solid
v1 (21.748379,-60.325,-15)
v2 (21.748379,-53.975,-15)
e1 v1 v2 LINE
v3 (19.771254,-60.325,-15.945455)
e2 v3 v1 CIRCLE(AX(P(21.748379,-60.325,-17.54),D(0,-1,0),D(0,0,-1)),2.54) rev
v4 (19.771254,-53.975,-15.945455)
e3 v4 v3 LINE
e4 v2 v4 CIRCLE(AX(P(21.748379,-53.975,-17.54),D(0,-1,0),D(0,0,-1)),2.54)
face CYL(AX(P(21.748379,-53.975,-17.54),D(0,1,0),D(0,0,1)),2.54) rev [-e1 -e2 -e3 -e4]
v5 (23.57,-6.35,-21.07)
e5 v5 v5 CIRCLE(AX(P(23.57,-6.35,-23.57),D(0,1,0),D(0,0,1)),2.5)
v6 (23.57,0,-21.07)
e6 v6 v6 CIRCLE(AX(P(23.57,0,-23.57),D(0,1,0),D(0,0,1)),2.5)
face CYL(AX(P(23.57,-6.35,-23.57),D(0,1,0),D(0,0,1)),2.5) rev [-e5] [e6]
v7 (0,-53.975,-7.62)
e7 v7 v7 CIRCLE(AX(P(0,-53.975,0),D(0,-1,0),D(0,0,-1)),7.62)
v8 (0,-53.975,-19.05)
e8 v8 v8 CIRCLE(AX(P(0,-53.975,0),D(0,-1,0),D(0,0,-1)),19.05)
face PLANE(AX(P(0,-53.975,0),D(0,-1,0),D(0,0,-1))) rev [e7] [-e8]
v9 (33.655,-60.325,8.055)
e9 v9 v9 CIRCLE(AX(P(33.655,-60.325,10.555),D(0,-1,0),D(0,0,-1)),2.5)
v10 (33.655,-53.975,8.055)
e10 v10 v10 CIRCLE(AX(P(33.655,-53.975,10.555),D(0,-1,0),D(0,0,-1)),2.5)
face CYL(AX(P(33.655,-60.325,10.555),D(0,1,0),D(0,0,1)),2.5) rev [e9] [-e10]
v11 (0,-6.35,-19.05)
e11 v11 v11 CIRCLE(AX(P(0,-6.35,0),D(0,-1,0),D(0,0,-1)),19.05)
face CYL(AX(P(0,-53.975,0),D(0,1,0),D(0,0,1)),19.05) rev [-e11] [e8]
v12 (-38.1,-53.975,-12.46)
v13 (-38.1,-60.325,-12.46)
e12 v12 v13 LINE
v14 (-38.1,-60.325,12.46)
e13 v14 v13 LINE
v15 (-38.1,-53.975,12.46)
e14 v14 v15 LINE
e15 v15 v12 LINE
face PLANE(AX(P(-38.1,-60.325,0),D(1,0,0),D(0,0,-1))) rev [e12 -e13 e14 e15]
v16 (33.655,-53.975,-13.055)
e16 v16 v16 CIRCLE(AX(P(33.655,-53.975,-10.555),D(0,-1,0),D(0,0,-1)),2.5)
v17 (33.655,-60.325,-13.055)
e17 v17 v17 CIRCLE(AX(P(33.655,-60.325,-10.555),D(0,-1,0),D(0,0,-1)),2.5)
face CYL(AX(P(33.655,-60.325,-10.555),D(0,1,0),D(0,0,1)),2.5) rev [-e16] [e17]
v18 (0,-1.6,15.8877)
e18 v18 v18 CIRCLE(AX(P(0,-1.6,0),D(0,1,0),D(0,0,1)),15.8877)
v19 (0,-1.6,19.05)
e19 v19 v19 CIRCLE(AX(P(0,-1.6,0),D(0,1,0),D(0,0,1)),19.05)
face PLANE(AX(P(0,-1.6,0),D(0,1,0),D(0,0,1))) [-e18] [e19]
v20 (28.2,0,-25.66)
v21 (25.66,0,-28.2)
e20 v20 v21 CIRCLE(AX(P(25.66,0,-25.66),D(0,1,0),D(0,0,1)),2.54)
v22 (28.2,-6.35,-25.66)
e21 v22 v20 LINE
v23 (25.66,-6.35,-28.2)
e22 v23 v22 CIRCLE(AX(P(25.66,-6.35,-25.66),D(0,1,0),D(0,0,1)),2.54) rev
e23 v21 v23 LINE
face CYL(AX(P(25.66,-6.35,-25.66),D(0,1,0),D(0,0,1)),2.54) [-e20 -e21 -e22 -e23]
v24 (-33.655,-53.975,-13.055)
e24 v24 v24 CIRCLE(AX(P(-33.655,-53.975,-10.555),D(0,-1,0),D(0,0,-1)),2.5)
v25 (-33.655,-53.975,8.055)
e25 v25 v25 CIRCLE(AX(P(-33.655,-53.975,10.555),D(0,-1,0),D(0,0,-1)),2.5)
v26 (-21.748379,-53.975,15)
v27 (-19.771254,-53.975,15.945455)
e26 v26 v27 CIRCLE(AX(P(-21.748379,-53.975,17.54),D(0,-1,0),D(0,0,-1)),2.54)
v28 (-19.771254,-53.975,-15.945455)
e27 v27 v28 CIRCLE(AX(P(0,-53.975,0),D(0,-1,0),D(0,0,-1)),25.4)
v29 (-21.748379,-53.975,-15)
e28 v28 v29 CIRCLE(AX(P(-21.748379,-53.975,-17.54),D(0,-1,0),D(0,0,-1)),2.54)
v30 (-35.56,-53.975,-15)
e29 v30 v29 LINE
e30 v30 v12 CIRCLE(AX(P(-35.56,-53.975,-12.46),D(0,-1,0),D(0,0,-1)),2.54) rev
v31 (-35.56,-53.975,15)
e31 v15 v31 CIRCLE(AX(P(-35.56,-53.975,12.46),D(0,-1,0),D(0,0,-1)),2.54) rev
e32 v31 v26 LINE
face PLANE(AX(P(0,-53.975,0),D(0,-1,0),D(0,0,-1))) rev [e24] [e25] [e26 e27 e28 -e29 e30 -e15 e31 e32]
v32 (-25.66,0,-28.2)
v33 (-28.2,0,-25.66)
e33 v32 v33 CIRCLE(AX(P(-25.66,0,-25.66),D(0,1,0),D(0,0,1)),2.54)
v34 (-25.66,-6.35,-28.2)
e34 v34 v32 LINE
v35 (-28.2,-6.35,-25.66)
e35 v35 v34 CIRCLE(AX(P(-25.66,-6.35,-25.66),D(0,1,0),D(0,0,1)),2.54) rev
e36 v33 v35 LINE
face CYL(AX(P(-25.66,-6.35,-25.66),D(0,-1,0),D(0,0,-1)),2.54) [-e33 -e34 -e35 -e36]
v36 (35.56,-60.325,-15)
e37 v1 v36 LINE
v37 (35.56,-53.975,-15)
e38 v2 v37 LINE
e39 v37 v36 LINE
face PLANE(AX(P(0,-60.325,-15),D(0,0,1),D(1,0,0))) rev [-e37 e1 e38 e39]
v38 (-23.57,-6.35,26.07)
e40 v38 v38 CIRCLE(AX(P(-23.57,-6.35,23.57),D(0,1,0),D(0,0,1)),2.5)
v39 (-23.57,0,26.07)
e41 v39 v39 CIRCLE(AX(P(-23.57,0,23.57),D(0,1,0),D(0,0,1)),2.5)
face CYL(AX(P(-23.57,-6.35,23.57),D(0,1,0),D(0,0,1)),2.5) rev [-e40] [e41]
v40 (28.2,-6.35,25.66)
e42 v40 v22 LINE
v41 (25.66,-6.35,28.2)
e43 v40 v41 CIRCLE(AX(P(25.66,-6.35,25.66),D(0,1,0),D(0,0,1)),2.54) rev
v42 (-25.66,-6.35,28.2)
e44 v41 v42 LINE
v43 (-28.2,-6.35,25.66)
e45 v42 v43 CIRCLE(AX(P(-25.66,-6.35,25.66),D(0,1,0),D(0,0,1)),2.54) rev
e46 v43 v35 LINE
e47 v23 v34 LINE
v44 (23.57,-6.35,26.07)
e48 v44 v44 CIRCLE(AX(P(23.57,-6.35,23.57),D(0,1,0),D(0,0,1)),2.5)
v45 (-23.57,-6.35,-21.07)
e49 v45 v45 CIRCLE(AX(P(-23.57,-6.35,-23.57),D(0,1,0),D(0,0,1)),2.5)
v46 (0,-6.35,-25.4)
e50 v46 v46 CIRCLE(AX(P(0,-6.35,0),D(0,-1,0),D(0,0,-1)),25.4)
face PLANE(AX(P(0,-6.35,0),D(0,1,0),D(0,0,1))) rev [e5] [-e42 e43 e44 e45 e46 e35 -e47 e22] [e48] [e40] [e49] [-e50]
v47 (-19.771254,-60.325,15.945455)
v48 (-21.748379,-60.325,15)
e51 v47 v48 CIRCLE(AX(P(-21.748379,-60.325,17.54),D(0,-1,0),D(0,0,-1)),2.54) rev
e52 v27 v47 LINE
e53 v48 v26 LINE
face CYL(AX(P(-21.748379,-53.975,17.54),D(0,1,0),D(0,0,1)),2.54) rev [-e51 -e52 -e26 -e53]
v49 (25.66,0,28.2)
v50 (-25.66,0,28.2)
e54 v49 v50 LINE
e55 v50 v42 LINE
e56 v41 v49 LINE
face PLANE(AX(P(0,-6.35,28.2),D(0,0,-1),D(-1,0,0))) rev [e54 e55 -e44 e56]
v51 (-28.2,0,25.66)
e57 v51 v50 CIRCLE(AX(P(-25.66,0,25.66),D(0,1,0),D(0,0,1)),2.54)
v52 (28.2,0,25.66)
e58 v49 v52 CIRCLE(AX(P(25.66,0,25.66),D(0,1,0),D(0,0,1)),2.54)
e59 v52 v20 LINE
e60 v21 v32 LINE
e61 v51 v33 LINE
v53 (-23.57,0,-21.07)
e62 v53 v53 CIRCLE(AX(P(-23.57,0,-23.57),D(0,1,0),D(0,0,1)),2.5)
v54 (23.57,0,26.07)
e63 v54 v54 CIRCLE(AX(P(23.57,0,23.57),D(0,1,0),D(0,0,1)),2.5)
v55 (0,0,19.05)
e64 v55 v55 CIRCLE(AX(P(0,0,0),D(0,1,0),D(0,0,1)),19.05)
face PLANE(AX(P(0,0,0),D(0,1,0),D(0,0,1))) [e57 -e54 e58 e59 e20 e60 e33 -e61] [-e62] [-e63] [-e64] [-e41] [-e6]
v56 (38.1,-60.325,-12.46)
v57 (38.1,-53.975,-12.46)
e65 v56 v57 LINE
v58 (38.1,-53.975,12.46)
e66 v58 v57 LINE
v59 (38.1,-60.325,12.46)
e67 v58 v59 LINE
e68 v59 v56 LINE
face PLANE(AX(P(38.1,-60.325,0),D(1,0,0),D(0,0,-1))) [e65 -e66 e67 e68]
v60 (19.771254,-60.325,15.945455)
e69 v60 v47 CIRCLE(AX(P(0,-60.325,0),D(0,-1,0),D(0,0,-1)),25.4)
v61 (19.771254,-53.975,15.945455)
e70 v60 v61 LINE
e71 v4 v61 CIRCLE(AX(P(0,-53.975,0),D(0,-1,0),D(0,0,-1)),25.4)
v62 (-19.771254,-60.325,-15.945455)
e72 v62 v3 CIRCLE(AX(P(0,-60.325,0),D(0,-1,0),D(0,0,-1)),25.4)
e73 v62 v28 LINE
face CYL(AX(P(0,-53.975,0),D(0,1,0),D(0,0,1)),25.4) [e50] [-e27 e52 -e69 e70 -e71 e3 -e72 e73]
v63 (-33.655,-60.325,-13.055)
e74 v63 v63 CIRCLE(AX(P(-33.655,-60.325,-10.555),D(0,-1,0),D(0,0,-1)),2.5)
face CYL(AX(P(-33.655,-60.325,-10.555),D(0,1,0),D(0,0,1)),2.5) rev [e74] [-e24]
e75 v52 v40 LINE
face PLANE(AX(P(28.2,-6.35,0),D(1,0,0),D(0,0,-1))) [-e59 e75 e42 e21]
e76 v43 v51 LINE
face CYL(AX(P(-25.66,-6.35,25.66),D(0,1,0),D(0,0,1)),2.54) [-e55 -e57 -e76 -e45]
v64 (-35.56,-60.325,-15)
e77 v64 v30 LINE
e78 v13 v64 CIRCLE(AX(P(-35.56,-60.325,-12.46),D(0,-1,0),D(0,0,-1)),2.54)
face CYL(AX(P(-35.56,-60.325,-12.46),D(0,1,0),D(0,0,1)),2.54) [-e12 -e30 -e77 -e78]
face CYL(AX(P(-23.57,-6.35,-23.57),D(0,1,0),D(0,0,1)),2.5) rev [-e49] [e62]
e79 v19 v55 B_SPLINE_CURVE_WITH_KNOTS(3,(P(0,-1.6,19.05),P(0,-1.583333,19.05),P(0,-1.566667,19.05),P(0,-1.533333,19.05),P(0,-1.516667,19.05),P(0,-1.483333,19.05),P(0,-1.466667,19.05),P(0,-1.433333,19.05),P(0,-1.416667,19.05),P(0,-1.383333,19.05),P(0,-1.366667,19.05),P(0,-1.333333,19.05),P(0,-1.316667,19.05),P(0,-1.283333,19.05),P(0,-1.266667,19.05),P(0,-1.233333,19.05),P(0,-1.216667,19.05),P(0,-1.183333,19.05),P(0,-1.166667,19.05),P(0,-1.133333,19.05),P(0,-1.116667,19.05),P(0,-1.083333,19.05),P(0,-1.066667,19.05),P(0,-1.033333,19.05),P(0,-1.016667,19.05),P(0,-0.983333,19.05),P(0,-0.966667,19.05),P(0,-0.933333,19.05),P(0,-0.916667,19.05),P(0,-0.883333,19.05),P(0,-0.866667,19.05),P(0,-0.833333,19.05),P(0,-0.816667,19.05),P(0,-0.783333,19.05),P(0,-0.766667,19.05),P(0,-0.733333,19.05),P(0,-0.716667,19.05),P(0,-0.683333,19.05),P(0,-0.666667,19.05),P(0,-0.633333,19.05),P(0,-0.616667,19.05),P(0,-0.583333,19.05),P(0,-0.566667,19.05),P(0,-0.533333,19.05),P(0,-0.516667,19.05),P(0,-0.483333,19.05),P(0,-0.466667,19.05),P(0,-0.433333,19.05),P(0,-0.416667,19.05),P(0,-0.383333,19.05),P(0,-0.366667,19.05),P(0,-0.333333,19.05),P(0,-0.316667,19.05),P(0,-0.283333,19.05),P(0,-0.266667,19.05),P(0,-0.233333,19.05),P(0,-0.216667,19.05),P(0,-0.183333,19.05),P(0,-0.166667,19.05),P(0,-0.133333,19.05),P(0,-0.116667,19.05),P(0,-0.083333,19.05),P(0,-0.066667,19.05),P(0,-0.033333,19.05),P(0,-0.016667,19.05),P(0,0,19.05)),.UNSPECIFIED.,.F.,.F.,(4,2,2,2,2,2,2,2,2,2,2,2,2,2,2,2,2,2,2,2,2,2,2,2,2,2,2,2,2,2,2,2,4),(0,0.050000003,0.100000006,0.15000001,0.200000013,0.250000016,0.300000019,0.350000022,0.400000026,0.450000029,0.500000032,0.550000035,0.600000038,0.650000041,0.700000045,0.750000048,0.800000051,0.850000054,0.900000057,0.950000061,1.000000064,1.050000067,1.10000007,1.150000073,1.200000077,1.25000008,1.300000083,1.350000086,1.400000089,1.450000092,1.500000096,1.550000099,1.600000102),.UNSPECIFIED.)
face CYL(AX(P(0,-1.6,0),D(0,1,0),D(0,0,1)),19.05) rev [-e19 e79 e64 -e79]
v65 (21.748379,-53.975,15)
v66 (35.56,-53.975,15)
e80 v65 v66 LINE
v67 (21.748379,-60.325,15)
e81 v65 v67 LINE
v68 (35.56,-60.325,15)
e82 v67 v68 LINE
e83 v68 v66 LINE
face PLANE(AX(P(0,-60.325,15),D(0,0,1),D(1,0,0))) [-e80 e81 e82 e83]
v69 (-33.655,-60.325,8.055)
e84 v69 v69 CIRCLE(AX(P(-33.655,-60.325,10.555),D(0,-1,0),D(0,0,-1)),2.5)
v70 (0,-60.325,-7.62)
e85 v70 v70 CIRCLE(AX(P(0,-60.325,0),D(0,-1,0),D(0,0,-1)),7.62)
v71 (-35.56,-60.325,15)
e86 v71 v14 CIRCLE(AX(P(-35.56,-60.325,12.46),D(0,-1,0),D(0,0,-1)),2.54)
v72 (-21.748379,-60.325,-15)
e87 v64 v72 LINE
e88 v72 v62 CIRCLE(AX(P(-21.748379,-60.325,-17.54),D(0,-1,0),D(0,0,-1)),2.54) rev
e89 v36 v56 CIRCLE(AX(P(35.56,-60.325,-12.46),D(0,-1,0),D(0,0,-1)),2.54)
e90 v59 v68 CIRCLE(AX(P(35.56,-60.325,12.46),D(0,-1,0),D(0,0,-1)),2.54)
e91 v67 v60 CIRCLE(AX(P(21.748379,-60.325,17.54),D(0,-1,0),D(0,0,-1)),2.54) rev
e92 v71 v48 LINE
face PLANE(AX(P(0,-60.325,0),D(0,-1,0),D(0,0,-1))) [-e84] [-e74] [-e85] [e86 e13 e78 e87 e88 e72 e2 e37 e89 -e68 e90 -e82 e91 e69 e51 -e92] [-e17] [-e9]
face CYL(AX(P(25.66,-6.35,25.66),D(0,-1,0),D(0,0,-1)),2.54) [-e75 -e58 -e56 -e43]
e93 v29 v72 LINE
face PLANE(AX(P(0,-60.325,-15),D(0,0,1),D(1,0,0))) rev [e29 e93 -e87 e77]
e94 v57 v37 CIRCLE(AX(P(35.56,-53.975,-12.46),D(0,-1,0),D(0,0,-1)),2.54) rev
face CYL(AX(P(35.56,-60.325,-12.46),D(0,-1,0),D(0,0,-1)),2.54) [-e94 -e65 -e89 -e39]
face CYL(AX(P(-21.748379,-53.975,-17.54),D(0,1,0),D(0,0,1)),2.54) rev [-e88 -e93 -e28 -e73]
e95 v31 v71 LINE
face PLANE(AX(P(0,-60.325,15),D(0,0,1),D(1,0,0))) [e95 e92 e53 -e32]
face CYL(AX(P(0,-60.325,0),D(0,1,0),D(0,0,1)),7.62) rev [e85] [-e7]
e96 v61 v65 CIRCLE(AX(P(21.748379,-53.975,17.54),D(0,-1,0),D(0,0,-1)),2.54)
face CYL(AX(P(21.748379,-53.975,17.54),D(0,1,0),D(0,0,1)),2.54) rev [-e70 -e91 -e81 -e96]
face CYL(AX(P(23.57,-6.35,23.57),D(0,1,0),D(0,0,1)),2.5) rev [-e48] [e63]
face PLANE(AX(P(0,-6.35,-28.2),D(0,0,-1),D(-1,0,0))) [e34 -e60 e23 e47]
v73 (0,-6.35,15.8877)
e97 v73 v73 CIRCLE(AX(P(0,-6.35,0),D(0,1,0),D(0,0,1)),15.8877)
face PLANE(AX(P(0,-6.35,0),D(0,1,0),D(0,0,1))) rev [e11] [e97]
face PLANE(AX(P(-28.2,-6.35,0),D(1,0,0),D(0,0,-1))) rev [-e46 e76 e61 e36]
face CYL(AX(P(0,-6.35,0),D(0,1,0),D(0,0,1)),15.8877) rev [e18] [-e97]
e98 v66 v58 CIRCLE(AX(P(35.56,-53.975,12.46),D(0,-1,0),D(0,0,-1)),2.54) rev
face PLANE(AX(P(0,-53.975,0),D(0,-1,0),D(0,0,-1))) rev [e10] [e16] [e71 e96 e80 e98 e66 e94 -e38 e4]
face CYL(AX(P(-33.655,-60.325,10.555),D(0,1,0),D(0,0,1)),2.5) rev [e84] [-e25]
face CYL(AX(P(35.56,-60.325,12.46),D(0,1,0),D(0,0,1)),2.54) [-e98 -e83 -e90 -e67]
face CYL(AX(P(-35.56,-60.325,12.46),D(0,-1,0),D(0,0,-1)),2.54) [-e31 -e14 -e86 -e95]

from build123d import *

# Parameters (mm, degrees)
SKETCH2_W           = 56.399999976
SKETCH2_H           = 56.399999976
SKETCH2_R           = 15.8877
SKETCH2_R_2         = 2.499999953
BOSS_EXTRUDE1_DEPTH = 6.35
SKETCH2_4_R         = 19.05
SKETCH2_4_R_2       = 15.8877
CUT_EXTRUDE2_DEPTH  = 1.600000102
SKETCH3_R           = 25.4
SKETCH3_R_2         = 19.05
BOSS_EXTRUDE2_DEPTH = 47.625
SKETCH4_R           = 2.5
SKETCH4_R_2         = 7.62
BOSS_EXTRUDE3_DEPTH = 6.35
FILLET1_R           = 2.54


with BuildPart() as part:
    # Sketch2 → Boss-Extrude1 (new body)
    with BuildSketch(Plane(origin=(0, 0, 0), x_dir=(1, 0, 0), z_dir=(0, 1, 0))):
        Rectangle(SKETCH2_W, SKETCH2_H)
        with Locations(Location((0, 0, 0), (0, 0, 270))):
            Circle(SKETCH2_R, mode=Mode.SUBTRACT)
        with Locations(Location((23.569999977, 23.569999977, 0), (0, 0, 270))):
            Circle(SKETCH2_R_2, mode=Mode.SUBTRACT)
        with Locations(Location((23.569999977, -23.569999977, 0), (0, 0, 270))):
            Circle(SKETCH2_R_2, mode=Mode.SUBTRACT)
        with Locations(Location((-23.569999977, -23.569999977, 0), (0, 0, 270))):
            Circle(SKETCH2_R_2, mode=Mode.SUBTRACT)
        with Locations(Location((-23.569999977, 23.569999977, 0), (0, 0, 270))):
            Circle(SKETCH2_R_2, mode=Mode.SUBTRACT)
    extrude(amount=-BOSS_EXTRUDE1_DEPTH)

    # Sketch2<4> → Cut-Extrude2 (cut)
    with BuildSketch(Plane(origin=(0, 0, 0), x_dir=(1, 0, 0), z_dir=(0, 1, 0))):
        with Locations(Location((0, 0, 0), (0, 0, 270))):
            Circle(SKETCH2_4_R)
        with Locations(Location((0, 0, 0), (0, 0, 270))):
            Circle(SKETCH2_4_R_2, mode=Mode.SUBTRACT)
    extrude(amount=-CUT_EXTRUDE2_DEPTH, mode=Mode.SUBTRACT)

    # Sketch3 → Boss-Extrude2 (add)
    with BuildSketch(Plane.XZ.offset(6.35)):
        with Locations(Location((0, 0, 0), (0, 0, 270))):
            Circle(SKETCH3_R)
        with Locations(Location((0, 0, 0), (0, 0, 90))):
            Circle(SKETCH3_R_2, mode=Mode.SUBTRACT)
    extrude(amount=BOSS_EXTRUDE2_DEPTH)

    # Sketch4 → Boss-Extrude3 (add)
    with BuildSketch(Plane.XZ.offset(53.975)):
        with BuildLine():
            Line((38.1, -14.999999972), (38.1, 14.999999972))
            Line((38.1, 14.999999972), (20.497804781, 14.999999972))
            ThreePointArc((20.497804781, 14.999999972), (0, 25.4), (-20.497804781, 14.999999972))
            Line((-20.497804781, 14.999999972), (-38.1, 14.999999972))
            Line((-38.1, 14.999999972), (-38.1, -14.999999972))
            Line((-38.1, -14.999999972), (-20.497804781, -14.999999972))
            ThreePointArc((-20.497804781, -14.999999972), (0, -25.4), (20.497804781, -14.999999972))
            Line((20.497804781, -14.999999972), (38.1, -14.999999972))
        make_face()
        with Locations(Location((-33.655, -10.554999972, 0), (0, 0, 270))):
            Circle(SKETCH4_R, mode=Mode.SUBTRACT)
        with Locations(Location((0, 0, 0), (0, 0, 270))):
            Circle(SKETCH4_R_2, mode=Mode.SUBTRACT)
        with Locations(Location((-33.655, 10.554999972, 0), (0, 0, 270))):
            Circle(SKETCH4_R, mode=Mode.SUBTRACT)
        with Locations(Location((33.655, -10.554999972, 0), (0, 0, 270))):
            Circle(SKETCH4_R, mode=Mode.SUBTRACT)
        with Locations(Location((33.655, 10.554999972, 0), (0, 0, 270))):
            Circle(SKETCH4_R, mode=Mode.SUBTRACT)
    extrude(amount=BOSS_EXTRUDE3_DEPTH)

    # Fillet1
    # the kernel refuses this fillet: 2.54 mm, written as the material it adds along each edge
    with BuildSketch(Plane(origin=(20.497804781, -53.975, 14.999999972), x_dir=(-0.6093303633188096, 0, 0.7929164573508154), z_dir=(0, -1, 0)), Plane(origin=(-20.497804781, -53.975, -14.999999972), x_dir=(0.609330363318784, 0, -0.7929164573508352), z_dir=(0, -1, 0))) as fillet1_piece_1:
        with BuildLine():
            CenterArc((1.251994792, -2.539300218), FILLET1_R, 91.344968241, 51.113932151)
            Line((-0.762013009, -0.991601095), (0, 0))
            ThreePointArc((0, 0), (0.596187996, -0.006997817), (1.192375993, 0))
        make_face()
    extrude(amount=6.35)
    with BuildSketch(Plane(origin=(-20.497804781, -53.975, 14.999999972), x_dir=(0.6093303633187793, 0, 0.7929164573508387), z_dir=(0, -1, 0)), Plane(origin=(20.497804781, -53.975, -14.999999972), x_dir=(-0.609330363318815, 0, -0.7929164573508114), z_dir=(0, -1, 0))) as fillet1_piece_2:
        with BuildLine():
            CenterArc((1.251994792, 2.539300218), FILLET1_R, 217.541099608, 51.113932151)
            Line((-0.762013009, 0.991601095), (0, 0))
            ThreePointArc((0, 0), (0.596187996, 0.006997817), (1.192375993, 0))
        make_face()
    extrude(amount=6.35)
    # the kernel refuses this fillet: 2.54 mm, written as the material it takes off along each edge
    with BuildSketch(Plane(origin=(-28.199999988, 6.35, -28.199999988), x_dir=(0, 0, 1), z_dir=(0, -1, 0)), Plane(origin=(-28.199999988, 6.35, 28.199999988), x_dir=(1, 0, 0), z_dir=(0, -1, 0)), Plane(origin=(38.1, -47.625, -14.999999972), x_dir=(-1, 0, 0), z_dir=(0, -1, 0)), Plane(origin=(38.1, -47.625, 14.999999972), x_dir=(0, 0, -1), z_dir=(0, -1, 0))) as fillet1_2_piece_1:
        with BuildLine():
            CenterArc((FILLET1_R, -FILLET1_R), FILLET1_R, 90, 90)
            Line((0, -FILLET1_R), (0, 0))
            Line((0, 0), (FILLET1_R, 0))
        make_face()
    extrude(amount=19.05, mode=Mode.SUBTRACT)
    with BuildSketch(Plane(origin=(28.199999988, 6.35, -28.199999988), x_dir=(0, 0, 1), z_dir=(0, -1, 0)), Plane(origin=(28.199999988, 6.35, 28.199999988), x_dir=(-1, 0, 0), z_dir=(0, -1, 0)), Plane(origin=(-38.1, -47.625, 14.999999972), x_dir=(0, 0, -1), z_dir=(0, -1, 0)), Plane(origin=(-38.1, -47.625, -14.999999972), x_dir=(1, 0, 0), z_dir=(0, -1, 0))) as fillet1_2_piece_2:
        with BuildLine():
            CenterArc((FILLET1_R, FILLET1_R), FILLET1_R, 180, 90)
            Line((0, FILLET1_R), (0, 0))
            Line((0, 0), (FILLET1_R, 0))
        make_face()
    extrude(amount=19.05, mode=Mode.SUBTRACT)


solid = part.part
